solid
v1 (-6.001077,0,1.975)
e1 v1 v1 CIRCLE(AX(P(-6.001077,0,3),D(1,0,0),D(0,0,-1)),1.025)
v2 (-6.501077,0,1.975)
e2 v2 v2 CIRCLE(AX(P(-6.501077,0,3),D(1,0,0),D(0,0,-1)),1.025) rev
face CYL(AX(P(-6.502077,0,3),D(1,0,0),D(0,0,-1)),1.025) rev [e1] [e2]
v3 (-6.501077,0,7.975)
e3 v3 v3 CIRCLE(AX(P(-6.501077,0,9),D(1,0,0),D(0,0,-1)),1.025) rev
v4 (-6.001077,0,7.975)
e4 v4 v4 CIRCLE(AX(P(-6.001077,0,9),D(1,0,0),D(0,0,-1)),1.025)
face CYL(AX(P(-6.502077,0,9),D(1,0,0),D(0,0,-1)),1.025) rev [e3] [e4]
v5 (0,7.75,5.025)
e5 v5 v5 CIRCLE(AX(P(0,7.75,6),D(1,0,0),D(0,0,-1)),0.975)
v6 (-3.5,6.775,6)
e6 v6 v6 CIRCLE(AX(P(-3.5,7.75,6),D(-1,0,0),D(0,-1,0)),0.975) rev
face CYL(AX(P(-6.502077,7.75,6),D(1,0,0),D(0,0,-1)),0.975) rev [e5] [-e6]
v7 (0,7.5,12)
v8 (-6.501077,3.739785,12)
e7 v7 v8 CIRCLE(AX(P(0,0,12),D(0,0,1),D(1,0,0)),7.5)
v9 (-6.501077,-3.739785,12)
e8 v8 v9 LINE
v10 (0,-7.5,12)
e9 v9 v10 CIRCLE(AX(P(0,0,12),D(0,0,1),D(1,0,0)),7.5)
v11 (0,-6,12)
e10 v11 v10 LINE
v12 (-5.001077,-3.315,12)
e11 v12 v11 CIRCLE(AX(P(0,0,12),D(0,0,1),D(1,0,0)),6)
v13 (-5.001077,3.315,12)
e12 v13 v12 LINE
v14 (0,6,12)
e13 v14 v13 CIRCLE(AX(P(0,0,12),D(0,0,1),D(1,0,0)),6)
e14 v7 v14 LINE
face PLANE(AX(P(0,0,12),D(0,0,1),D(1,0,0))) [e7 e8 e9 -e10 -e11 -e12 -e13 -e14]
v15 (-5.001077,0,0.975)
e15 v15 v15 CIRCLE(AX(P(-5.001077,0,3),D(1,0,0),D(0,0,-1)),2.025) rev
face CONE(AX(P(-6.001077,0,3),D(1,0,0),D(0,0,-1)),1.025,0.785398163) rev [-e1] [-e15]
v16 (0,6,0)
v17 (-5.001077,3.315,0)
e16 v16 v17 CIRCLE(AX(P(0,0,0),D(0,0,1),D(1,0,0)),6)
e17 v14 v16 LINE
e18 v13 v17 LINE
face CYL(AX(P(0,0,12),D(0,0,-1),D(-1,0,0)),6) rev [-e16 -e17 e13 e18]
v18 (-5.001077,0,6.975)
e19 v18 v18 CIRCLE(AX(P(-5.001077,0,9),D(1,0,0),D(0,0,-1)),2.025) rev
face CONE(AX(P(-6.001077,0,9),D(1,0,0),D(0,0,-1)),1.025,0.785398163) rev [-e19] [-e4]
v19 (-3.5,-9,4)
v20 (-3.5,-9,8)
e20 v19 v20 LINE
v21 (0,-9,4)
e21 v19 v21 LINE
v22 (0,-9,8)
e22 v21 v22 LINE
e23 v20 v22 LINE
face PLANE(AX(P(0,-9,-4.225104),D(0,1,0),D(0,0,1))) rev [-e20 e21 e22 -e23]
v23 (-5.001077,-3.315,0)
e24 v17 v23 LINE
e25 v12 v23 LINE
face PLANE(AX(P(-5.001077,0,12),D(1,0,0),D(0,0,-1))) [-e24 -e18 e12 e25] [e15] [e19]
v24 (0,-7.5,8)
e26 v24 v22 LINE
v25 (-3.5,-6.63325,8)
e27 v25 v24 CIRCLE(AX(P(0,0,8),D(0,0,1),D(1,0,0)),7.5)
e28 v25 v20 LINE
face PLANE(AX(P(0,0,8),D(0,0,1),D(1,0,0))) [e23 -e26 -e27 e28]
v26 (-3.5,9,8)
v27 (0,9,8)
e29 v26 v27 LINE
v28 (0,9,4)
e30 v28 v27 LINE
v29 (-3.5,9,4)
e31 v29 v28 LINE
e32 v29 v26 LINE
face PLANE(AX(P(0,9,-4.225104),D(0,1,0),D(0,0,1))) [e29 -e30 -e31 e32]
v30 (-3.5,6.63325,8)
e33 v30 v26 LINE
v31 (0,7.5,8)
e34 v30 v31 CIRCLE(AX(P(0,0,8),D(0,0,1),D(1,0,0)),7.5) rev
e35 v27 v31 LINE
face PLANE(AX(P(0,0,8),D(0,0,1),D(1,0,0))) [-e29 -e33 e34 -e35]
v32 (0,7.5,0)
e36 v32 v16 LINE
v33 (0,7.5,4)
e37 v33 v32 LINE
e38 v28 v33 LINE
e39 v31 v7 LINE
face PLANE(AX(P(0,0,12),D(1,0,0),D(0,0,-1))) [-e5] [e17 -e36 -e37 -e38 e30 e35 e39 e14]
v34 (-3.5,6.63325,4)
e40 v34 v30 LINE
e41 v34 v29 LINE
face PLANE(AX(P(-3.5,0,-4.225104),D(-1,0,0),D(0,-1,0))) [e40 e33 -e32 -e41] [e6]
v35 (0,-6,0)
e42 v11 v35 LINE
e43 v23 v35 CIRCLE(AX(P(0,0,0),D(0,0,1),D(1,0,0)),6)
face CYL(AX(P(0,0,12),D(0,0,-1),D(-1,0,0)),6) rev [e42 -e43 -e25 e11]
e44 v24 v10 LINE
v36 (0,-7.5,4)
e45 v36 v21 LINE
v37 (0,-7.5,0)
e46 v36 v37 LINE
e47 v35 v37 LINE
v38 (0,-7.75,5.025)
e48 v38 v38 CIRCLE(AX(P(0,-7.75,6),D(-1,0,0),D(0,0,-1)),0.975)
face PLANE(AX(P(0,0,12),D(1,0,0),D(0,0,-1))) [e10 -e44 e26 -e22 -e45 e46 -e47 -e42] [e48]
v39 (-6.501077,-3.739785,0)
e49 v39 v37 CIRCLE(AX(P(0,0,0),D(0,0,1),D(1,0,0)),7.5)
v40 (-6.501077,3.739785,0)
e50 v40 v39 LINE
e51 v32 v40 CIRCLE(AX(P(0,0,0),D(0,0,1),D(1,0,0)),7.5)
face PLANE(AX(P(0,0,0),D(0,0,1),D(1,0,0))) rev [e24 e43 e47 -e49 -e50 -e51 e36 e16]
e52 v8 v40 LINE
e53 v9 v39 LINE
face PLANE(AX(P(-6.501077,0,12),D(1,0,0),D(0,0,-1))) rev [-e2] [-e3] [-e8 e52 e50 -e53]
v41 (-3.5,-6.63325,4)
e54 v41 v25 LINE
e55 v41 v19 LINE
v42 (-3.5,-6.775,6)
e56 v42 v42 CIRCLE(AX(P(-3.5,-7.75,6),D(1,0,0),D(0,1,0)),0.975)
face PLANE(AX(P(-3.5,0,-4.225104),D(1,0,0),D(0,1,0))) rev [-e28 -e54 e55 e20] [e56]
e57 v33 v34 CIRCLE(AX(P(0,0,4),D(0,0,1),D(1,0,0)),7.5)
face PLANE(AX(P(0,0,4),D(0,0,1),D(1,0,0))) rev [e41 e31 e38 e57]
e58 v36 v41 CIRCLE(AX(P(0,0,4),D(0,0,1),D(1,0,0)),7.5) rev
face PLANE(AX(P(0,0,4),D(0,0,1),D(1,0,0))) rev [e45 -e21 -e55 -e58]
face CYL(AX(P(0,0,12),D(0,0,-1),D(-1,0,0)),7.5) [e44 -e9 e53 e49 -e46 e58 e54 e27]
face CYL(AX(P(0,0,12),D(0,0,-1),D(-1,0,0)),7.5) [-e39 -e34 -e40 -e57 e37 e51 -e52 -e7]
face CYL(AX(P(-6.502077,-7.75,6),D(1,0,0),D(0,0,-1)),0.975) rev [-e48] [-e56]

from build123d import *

# Parameters (mm, degrees)
BOSS_EXTRUDE2_DEPTH  = 12
BOSS_EXTRUDE3_START  = -12
BOSS_EXTRUDE3_DEPTH  = 12
CUT_EXTRUDE6_START   = -4
CUT_EXTRUDE6_DEPTH   = 4
CUT_EXTRUDE7_REACH   = 18.348
SKETCH4_R            = 0.975
MIRROR2_START        = -4
MIRROR2_COPY_1_DEPTH = 4
CUT_EXTRUDE8_REACH   = 17.812
SKETCH6_R            = 1.025
CHAMFER1_SIZE        = 1


# Read off the part's stored shape, not the designer's step: Boss-Extrude3
with BuildPart() as part:
    # Sketch1 → Boss-Extrude2 (new body)
    with BuildSketch(Plane.XY):
        with BuildLine():
            Line((0, 6), (0, 7.5))
            ThreePointArc((0, 7.5), (-3.75510396, 6.492241081), (-6.501077384, 3.739785134))
            Line((-6.501077384, 3.739785134), (-6.501077384, -3.739785134))
            ThreePointArc((-6.501077384, -3.739785134), (-3.75510396, -6.492241081), (0, -7.5))
            Line((0, -7.5), (0, -6))
            ThreePointArc((0, -6), (-2.838133189, -5.286303056), (-5.001077384, -3.315))
            ThreePointArc((-5.001077384, -3.315), (-6, 0), (-5.001077384, 3.315))
            ThreePointArc((-5.001077384, 3.315), (-2.838133189, 5.286303056), (0, 6))
        make_face()
        with BuildLine():
            Line((-5.001077384, -3.315), (-5.001077384, 3.315))
            ThreePointArc((-5.001077384, 3.315), (-6, 0), (-5.001077384, -3.315))
        make_face()
    extrude(amount=BOSS_EXTRUDE2_DEPTH)

    # Boss-Extrude3 outline → Boss-Extrude3 (add)
    with BuildSketch(Plane.XY.offset(12).offset(BOSS_EXTRUDE3_START)):
        with BuildLine():
            ThreePointArc((-3.5, 6.633249581), (-1.802862744, 7.280088319), (0, 7.5))
            Line((0, 7.5), (0, 9))
            Line((0, 9), (-3.5, 9))
            Line((-3.5, 9), (-3.5, 6.633249581))
        make_face()
    boss_extrude3 = extrude(amount=BOSS_EXTRUDE3_DEPTH)

    # Sketch3 → Cut-Extrude6 (cut)
    with BuildSketch(Plane.XY.offset(12).offset(CUT_EXTRUDE6_START)):
        with BuildLine():
            Line((-4.617876388, 10.846765639), (-4.617876388, 5.909756142))
            ThreePointArc((-4.617876388, 5.909756142), (-1.858071818, 7.266193578), (1.214101671, 7.401078106))
            Line((1.214101671, 7.401078106), (1.214101671, 10.846765639))
            Line((1.214101671, 10.846765639), (-4.617876388, 10.846765639))
        make_face()
    cut_extrude6 = extrude(amount=CUT_EXTRUDE6_DEPTH, mode=Mode.SUBTRACT)

    # Mirror1: Cut-Extrude6 across plane
    add(cut_extrude6.mirror(Plane.XY.offset(6)), mode=Mode.SUBTRACT)

    # Sketch4 → Cut-Extrude7 (cut, up to next)
    with BuildSketch(Plane(origin=(0, 0, 0), x_dir=(0, 0, -1), z_dir=(1, 0, 0)), mode=Mode.PRIVATE) as cut_extrude7_sk1:
        with Locations((-6, 7.75)):
            Circle(SKETCH4_R)
    cut_extrude7_tool1 = extrude(cut_extrude7_sk1.sketch, amount=-CUT_EXTRUDE7_REACH, mode=Mode.PRIVATE) & part.part
    cut_extrude7 = cut_extrude7_tool1.solids().sort_by_distance((0, 7.75, 6))[0]
    add(cut_extrude7, mode=Mode.SUBTRACT)

    # Mirror2: Boss-Extrude3, Cut-Extrude6, Cut-Extrude7 across plane
    add(boss_extrude3.mirror(Plane.ZX))
    add(cut_extrude6.mirror(Plane.ZX), mode=Mode.SUBTRACT)
    add(cut_extrude7.mirror(Plane.ZX), mode=Mode.SUBTRACT)

    # Mirror2 copy 1 sketch → Mirror2 copy 1 (cut)
    with BuildSketch(Plane(origin=(0, 0, 0), x_dir=(1, 0, 0), z_dir=(0, 0, -1)).offset(MIRROR2_START)):
        with BuildLine():
            Line((-4.617876388, 10.846765639), (-4.617876388, 5.909756142))
            ThreePointArc((-4.617876388, 5.909756142), (-1.858071818, 7.266193578), (1.214101671, 7.401078106))
            Line((1.214101671, 7.401078106), (1.214101671, 10.846765639))
            Line((1.214101671, 10.846765639), (-4.617876388, 10.846765639))
        make_face()
    extrude(amount=MIRROR2_COPY_1_DEPTH, mode=Mode.SUBTRACT)

    # Sketch6 → Cut-Extrude8 (cut, up to next)
    with BuildSketch(Plane(origin=(-5.001077384, 0, 0), x_dir=(0, 0, -1), z_dir=(1, 0, 0)), mode=Mode.PRIVATE) as cut_extrude8_sk1:
        with Locations((-9, 0)):
            Circle(SKETCH6_R)
    cut_extrude8_tool1 = extrude(cut_extrude8_sk1.sketch, amount=-CUT_EXTRUDE8_REACH, mode=Mode.PRIVATE) & part.part
    # Sketch6 → Cut-Extrude8 (cut, up to next)
    with BuildSketch(Plane(origin=(-5.001077384, 0, 0), x_dir=(0, 0, -1), z_dir=(1, 0, 0)), mode=Mode.PRIVATE) as cut_extrude8_sk2:
        with Locations((-3, 0)):
            Circle(SKETCH6_R)
    cut_extrude8_tool2 = extrude(cut_extrude8_sk2.sketch, amount=-CUT_EXTRUDE8_REACH, mode=Mode.PRIVATE) & part.part
    add(cut_extrude8_tool1.solids().sort_by_distance((-5.001077, 0, 9))[0], mode=Mode.SUBTRACT)
    add(cut_extrude8_tool2.solids().sort_by_distance((-5.001077, 0, 3))[0], mode=Mode.SUBTRACT)

    # Chamfer1
    chamfer1_edges = [part.edges().sort_by_distance(p)[0] for p in [
        (-5.001077384, 0, 10.025),
        (-5.001077384, 0, 4.025),
    ]]
    chamfer(chamfer1_edges, length=CHAMFER1_SIZE)


solid = part.part
